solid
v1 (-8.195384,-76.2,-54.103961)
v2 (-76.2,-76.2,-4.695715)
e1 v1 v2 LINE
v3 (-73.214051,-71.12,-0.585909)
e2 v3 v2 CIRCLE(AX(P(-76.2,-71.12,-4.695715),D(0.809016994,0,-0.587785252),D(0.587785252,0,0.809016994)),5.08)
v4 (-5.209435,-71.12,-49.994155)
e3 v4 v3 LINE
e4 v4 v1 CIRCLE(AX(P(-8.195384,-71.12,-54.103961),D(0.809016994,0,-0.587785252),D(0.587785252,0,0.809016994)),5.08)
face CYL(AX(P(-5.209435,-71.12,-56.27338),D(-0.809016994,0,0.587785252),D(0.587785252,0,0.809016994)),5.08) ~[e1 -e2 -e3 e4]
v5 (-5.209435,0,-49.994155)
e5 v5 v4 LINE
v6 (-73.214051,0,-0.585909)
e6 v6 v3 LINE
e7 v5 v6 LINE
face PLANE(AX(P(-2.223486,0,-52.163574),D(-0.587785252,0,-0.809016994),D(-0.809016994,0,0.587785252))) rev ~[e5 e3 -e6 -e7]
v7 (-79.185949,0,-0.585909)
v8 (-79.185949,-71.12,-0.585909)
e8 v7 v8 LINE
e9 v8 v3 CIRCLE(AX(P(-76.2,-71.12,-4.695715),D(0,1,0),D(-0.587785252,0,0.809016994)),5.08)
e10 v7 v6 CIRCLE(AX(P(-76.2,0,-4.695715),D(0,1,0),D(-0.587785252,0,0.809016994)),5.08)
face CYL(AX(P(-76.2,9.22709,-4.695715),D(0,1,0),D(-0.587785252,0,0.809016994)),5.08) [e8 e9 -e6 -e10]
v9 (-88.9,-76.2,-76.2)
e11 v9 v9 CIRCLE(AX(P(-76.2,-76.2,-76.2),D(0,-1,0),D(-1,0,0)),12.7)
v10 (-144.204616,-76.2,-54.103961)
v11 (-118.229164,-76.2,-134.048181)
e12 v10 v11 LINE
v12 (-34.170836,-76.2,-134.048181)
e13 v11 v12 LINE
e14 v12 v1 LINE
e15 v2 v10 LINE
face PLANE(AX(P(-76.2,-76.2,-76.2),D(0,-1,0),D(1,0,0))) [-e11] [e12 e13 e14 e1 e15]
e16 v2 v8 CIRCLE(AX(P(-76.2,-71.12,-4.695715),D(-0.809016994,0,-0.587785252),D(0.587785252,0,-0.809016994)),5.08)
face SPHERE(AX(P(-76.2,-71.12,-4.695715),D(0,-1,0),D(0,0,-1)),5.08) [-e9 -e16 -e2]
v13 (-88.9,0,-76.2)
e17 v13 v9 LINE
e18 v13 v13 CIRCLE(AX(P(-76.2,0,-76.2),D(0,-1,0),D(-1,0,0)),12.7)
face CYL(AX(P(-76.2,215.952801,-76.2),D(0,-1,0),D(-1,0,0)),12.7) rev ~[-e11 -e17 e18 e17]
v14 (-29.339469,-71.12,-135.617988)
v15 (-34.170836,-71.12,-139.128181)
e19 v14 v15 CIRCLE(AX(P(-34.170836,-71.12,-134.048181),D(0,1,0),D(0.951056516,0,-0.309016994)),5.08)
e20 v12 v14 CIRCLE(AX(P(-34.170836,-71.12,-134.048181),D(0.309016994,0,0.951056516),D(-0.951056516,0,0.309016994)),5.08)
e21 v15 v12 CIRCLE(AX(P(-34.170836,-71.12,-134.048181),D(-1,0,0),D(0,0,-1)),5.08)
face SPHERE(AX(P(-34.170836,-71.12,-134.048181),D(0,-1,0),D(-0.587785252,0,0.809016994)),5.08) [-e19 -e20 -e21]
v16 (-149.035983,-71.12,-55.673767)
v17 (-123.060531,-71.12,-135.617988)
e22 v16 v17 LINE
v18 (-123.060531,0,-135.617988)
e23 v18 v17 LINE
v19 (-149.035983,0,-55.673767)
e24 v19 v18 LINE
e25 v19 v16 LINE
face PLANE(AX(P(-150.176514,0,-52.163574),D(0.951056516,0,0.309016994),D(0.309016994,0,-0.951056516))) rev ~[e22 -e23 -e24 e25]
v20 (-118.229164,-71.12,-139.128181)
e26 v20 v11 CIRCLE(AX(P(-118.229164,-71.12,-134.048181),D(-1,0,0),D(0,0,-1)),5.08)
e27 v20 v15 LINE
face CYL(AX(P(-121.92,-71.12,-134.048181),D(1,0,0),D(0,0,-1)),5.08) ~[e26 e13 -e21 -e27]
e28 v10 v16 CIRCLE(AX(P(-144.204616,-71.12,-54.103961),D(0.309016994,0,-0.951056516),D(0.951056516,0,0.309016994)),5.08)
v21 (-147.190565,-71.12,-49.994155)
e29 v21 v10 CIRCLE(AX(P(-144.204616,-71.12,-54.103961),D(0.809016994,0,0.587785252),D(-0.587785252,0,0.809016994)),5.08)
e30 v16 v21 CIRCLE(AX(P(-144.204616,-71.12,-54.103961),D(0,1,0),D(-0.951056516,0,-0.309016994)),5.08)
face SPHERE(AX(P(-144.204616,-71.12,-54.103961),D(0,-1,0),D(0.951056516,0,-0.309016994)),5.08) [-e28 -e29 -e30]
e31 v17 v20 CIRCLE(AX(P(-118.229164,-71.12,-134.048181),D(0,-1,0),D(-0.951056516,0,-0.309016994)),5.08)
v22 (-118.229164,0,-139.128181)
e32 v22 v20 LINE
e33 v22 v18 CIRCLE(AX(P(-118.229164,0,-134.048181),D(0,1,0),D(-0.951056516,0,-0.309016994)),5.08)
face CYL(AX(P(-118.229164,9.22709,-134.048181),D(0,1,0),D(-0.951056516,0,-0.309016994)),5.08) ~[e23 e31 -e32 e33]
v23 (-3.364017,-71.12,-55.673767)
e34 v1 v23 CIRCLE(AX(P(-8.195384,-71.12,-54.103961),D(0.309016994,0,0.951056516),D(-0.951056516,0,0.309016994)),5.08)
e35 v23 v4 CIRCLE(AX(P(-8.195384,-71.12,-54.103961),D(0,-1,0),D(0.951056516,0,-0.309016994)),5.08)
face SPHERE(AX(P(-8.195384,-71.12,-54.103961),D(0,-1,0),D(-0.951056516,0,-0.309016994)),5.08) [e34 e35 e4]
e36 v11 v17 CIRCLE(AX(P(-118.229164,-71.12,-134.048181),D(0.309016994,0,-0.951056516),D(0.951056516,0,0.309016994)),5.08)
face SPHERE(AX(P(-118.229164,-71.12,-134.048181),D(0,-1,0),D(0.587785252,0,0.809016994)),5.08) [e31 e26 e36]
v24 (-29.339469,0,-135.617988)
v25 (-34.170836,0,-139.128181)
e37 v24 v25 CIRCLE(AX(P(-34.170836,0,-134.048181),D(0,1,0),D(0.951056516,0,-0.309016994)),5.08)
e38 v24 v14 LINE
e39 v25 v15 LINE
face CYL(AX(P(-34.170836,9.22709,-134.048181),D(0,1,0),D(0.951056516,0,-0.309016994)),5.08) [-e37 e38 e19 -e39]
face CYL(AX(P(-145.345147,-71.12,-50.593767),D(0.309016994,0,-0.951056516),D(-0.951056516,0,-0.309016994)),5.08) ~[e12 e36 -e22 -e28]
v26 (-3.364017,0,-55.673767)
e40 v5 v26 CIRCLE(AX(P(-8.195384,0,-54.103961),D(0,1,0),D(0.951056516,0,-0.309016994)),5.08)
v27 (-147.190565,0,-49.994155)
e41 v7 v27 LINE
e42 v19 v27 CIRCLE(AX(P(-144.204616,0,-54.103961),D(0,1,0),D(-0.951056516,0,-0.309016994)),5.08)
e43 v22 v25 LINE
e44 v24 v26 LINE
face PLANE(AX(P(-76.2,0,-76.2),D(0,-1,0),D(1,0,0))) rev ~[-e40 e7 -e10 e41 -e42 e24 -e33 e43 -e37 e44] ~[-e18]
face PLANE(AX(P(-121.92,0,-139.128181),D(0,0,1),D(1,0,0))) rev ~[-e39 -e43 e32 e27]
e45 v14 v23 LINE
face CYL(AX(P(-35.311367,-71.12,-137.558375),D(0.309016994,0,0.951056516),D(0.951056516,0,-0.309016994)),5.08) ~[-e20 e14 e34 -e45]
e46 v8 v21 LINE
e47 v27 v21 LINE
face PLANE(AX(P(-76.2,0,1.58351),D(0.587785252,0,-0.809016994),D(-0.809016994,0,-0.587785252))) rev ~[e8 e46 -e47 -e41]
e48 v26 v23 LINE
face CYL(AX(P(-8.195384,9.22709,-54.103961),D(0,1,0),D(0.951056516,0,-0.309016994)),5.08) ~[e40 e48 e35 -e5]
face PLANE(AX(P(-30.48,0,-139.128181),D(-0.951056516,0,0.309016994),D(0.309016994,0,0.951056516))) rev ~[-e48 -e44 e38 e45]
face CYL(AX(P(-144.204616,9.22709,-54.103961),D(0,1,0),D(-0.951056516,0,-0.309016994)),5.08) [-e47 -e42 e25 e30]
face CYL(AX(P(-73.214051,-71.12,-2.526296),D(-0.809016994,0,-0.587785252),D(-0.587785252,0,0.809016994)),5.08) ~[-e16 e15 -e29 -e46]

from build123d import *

# Parameters (mm, degrees)
F1_DEPTH     = 76.2
F2_R         = 5.08
F3_T1_DEPTH  = 80.3470901057
F3_T6_DEPTH  = 5.08
F5_T1_DEPTH  = 80.3470901057
F5_T6_DEPTH  = 5.08
F5_T12_DEPTH = 5.08
F6_T1_DEPTH  = 80.3470901057
F6_T6_DEPTH  = 5.08
F6_T12_DEPTH = 5.08
F7_D         = 25.4


# Not quite as in the source:
# - a fillet or chamfer that OpenCascade refuses, or shapes differently, is made with other operations: its cross-section is extruded or revolved along the edge and cut away or added
# - a feature of the source that left no trace in its solid (it failed there, or was rolled back) is left out


with BuildPart() as f1:
    # F0 (on Front) → F1 (new body)
    with BuildSketch(Plane.XZ):
        Polygon((-30.48, -139.1281814039), (-2.2234860344, -52.1635735539), (-76.2, 1.5835099157), (-150.1765139656, -52.1635735539), (-121.92, -139.1281814039), align=None)
    extrude(amount=F1_DEPTH)

    # F2
    f2_edges = [f1.edges().sort_by_distance(p)[0] for p in [
        (-16.351743, -76.2, -95.645877),
        (-39.211743, -76.2, -25.290032),
        (-113.188257, -76.2, -25.290032),
        (-136.048257, -76.2, -95.645877),
        (-76.2, -76.2, -139.128181),
    ]]
    fillet(f2_edges, radius=F2_R)

    # F3: fillet of radius 5.08 on 1 edges, made by hand

    # F3_s2 → F3_t1 (cut)
    with BuildSketch(Plane.XZ.offset(-9.2270901057)):
        with BuildLine():
            ThreePointArc((-149.0359829051, -55.6737672225), (-149.0359829051, -52.5341545596), (-147.190564884, -49.9941545596))
            Line((-147.190564884, -49.9941545596), (-150.1765139656, -52.1635735539))
            Line((-150.1765139656, -52.1635735539), (-149.0359829051, -55.6737672225))
        make_face()
    extrude(amount=F3_T1_DEPTH, mode=Mode.SUBTRACT)


with BuildPart() as f3_tool4:
    # F3_s5 → F3_t6 (new body)
    with BuildSketch(Plane.XZ.offset(71.12)):
        Polygon((-144.2046158024, -54.1039608911), (-149.0359829051, -55.6737672225), (-150.1765139656, -52.1635735539), (-147.190564884, -49.9941545596), align=None)
    extrude(amount=F3_T6_DEPTH)

    # F3_s7 → F3_t8 (revolve, cut)
    with BuildSketch(Plane(origin=(-144.2046158024, -71.12, -54.1039608911), x_dir=(0.9510565163, 0, -0.3090169944), z_dir=(-0.3090169944, 0, -0.9510565163))):
        with BuildLine():
            ThreePointArc((0, -5.08), (5.08, 0), (0, 5.08))
            Line((0, 5.08), (0, -5.08))
        make_face()
    revolve(axis=Axis((-144.2046158024, -71.12, -54.1039608911), (0, -1, 0)), mode=Mode.SUBTRACT)


with BuildPart() as f1_1:
    add(f1.part)

    # F3_t3: cut F3_tool4
    add(f3_tool4.part, mode=Mode.SUBTRACT)

    # F5: fillet of radius 5.08 on 2 edges, made by hand

    # F5_s2 → F5_t1 (cut)
    with BuildSketch(Plane.XZ.offset(-9.2270901057)):
        with BuildLine():
            ThreePointArc((-29.3394689395, -135.6179877354), (-31.1848869606, -138.1579877354), (-34.1708360423, -139.1281814039))
            Line((-34.1708360423, -139.1281814039), (-30.48, -139.1281814039))
            Line((-30.48, -139.1281814039), (-29.3394689395, -135.6179877354))
        make_face()
        with BuildLine():
            ThreePointArc((-3.3640170949, -55.6737672225), (-3.3640170949, -52.5341545596), (-5.209435116, -49.9941545596))
            Line((-5.209435116, -49.9941545596), (-2.2234860344, -52.1635735539))
            Line((-2.2234860344, -52.1635735539), (-3.3640170949, -55.6737672225))
        make_face()
    extrude(amount=F5_T1_DEPTH, mode=Mode.SUBTRACT)


with BuildPart() as f5_tool4:
    # F5_s5 → F5_t6 (new body)
    with BuildSketch(Plane.XZ.offset(71.12)):
        Polygon((-8.1953841976, -54.1039608911), (-3.3640170949, -55.6737672225), (-2.2234860344, -52.1635735539), (-5.209435116, -49.9941545596), align=None)
    extrude(amount=F5_T6_DEPTH)

    # F5_s7 → F5_t8 (revolve, cut)
    with BuildSketch(Plane(origin=(-8.1953841976, -71.12, -54.1039608911), x_dir=(-0.9510565163, 0, -0.3090169944), z_dir=(-0.3090169944, 0, 0.9510565163))):
        with BuildLine():
            ThreePointArc((0, -5.08), (5.08, 0), (0, 5.08))
            Line((0, 5.08), (0, -5.08))
        make_face()
    revolve(axis=Axis((-8.1953841976, -71.12, -54.1039608911), (0, -1, 0)), mode=Mode.SUBTRACT)


with BuildPart() as f1_2:
    add(f1_1.part)

    # F5_t3: cut F5_tool4
    add(f5_tool4.part, mode=Mode.SUBTRACT)


with BuildPart() as f5_tool10:
    # F5_s11 → F5_t12 (new body)
    with BuildSketch(Plane.XZ.offset(71.12)):
        Polygon((-34.1708360423, -134.0481814039), (-29.3394689395, -135.6179877354), (-30.48, -139.1281814039), (-34.1708360423, -139.1281814039), align=None)
    extrude(amount=F5_T12_DEPTH)

    # F5_s13 → F5_t14 (revolve, cut)
    with BuildSketch(Plane(origin=(-34.1708360423, -71.12, -134.0481814039), x_dir=(-0.5877852523, 0, 0.8090169944), z_dir=(0.8090169944, 0, 0.5877852523))):
        with BuildLine():
            ThreePointArc((0, -5.08), (5.08, 0), (0, 5.08))
            Line((0, 5.08), (0, -5.08))
        make_face()
    revolve(axis=Axis((-34.1708360423, -71.12, -134.0481814039), (0, -1, 0)), mode=Mode.SUBTRACT)


with BuildPart() as f1_3:
    add(f1_2.part)

    # F5_t9: cut F5_tool10
    add(f5_tool10.part, mode=Mode.SUBTRACT)

    # F6: fillet of radius 5.08 on 2 edges, made by hand

    # F6_s2 → F6_t1 (cut)
    with BuildSketch(Plane.XZ.offset(-9.2270901057)):
        with BuildLine():
            ThreePointArc((-79.1859490816, -0.5859090786), (-76.2, 0.38428459), (-73.2140509184, -0.5859090786))
            Line((-73.2140509184, -0.5859090786), (-76.2, 1.5835099157))
            Line((-76.2, 1.5835099157), (-79.1859490816, -0.5859090786))
        make_face()
        with BuildLine():
            ThreePointArc((-123.0605310605, -135.6179877354), (-121.2151130394, -138.1579877354), (-118.2291639577, -139.1281814039))
            Line((-118.2291639577, -139.1281814039), (-121.92, -139.1281814039))
            Line((-121.92, -139.1281814039), (-123.0605310605, -135.6179877354))
        make_face()
    extrude(amount=F6_T1_DEPTH, mode=Mode.SUBTRACT)


with BuildPart() as f6_tool4:
    # F6_s5 → F6_t6 (new body)
    with BuildSketch(Plane.XZ.offset(71.12)):
        Polygon((-118.2291639577, -134.0481814039), (-123.0605310605, -135.6179877354), (-121.92, -139.1281814039), (-118.2291639577, -139.1281814039), align=None)
    extrude(amount=F6_T6_DEPTH)

    # F6_s7 → F6_t8 (revolve, cut)
    with BuildSketch(Plane(origin=(-118.2291639577, -71.12, -134.0481814039), x_dir=(0.5877852523, 0, 0.8090169944), z_dir=(0.8090169944, 0, -0.5877852523))):
        with BuildLine():
            ThreePointArc((0, -5.08), (5.08, 0), (0, 5.08))
            Line((0, 5.08), (0, -5.08))
        make_face()
    revolve(axis=Axis((-118.2291639577, -71.12, -134.0481814039), (0, -1, 0)), mode=Mode.SUBTRACT)


with BuildPart() as f1_4:
    add(f1_3.part)

    # F6_t3: cut F6_tool4
    add(f6_tool4.part, mode=Mode.SUBTRACT)


with BuildPart() as f6_tool10:
    # F6_s11 → F6_t12 (new body)
    with BuildSketch(Plane.XZ.offset(71.12)):
        Polygon((-76.2, -4.69571541), (-79.1859490816, -0.5859090786), (-76.2, 1.5835099157), (-73.2140509184, -0.5859090786), align=None)
    extrude(amount=F6_T12_DEPTH)

    # F6_s13 → F6_t14 (revolve, cut)
    with BuildSketch(Plane(origin=(-76.2, -71.12, -4.69571541), x_dir=(0, 0, -1), z_dir=(-1, 0, 0))):
        with BuildLine():
            ThreePointArc((0, -5.08), (5.08, 0), (0, 5.08))
            Line((0, 5.08), (0, -5.08))
        make_face()
    revolve(axis=Axis((-76.2, -71.12, -4.69571541), (0, -1, 0)), mode=Mode.SUBTRACT)


with BuildPart() as f1_5:
    add(f1_4.part)

    # F6_t9: cut F6_tool10
    add(f6_tool10.part, mode=Mode.SUBTRACT)

    # F7 (through all)
    with Locations(Plane(origin=(0, 0, 0), x_dir=(1, 0, 0), z_dir=(0, 1, 0))):
        with Locations((-76.2, 76.2)):
            Hole(F7_D / 2)


solid = f1_5.part
